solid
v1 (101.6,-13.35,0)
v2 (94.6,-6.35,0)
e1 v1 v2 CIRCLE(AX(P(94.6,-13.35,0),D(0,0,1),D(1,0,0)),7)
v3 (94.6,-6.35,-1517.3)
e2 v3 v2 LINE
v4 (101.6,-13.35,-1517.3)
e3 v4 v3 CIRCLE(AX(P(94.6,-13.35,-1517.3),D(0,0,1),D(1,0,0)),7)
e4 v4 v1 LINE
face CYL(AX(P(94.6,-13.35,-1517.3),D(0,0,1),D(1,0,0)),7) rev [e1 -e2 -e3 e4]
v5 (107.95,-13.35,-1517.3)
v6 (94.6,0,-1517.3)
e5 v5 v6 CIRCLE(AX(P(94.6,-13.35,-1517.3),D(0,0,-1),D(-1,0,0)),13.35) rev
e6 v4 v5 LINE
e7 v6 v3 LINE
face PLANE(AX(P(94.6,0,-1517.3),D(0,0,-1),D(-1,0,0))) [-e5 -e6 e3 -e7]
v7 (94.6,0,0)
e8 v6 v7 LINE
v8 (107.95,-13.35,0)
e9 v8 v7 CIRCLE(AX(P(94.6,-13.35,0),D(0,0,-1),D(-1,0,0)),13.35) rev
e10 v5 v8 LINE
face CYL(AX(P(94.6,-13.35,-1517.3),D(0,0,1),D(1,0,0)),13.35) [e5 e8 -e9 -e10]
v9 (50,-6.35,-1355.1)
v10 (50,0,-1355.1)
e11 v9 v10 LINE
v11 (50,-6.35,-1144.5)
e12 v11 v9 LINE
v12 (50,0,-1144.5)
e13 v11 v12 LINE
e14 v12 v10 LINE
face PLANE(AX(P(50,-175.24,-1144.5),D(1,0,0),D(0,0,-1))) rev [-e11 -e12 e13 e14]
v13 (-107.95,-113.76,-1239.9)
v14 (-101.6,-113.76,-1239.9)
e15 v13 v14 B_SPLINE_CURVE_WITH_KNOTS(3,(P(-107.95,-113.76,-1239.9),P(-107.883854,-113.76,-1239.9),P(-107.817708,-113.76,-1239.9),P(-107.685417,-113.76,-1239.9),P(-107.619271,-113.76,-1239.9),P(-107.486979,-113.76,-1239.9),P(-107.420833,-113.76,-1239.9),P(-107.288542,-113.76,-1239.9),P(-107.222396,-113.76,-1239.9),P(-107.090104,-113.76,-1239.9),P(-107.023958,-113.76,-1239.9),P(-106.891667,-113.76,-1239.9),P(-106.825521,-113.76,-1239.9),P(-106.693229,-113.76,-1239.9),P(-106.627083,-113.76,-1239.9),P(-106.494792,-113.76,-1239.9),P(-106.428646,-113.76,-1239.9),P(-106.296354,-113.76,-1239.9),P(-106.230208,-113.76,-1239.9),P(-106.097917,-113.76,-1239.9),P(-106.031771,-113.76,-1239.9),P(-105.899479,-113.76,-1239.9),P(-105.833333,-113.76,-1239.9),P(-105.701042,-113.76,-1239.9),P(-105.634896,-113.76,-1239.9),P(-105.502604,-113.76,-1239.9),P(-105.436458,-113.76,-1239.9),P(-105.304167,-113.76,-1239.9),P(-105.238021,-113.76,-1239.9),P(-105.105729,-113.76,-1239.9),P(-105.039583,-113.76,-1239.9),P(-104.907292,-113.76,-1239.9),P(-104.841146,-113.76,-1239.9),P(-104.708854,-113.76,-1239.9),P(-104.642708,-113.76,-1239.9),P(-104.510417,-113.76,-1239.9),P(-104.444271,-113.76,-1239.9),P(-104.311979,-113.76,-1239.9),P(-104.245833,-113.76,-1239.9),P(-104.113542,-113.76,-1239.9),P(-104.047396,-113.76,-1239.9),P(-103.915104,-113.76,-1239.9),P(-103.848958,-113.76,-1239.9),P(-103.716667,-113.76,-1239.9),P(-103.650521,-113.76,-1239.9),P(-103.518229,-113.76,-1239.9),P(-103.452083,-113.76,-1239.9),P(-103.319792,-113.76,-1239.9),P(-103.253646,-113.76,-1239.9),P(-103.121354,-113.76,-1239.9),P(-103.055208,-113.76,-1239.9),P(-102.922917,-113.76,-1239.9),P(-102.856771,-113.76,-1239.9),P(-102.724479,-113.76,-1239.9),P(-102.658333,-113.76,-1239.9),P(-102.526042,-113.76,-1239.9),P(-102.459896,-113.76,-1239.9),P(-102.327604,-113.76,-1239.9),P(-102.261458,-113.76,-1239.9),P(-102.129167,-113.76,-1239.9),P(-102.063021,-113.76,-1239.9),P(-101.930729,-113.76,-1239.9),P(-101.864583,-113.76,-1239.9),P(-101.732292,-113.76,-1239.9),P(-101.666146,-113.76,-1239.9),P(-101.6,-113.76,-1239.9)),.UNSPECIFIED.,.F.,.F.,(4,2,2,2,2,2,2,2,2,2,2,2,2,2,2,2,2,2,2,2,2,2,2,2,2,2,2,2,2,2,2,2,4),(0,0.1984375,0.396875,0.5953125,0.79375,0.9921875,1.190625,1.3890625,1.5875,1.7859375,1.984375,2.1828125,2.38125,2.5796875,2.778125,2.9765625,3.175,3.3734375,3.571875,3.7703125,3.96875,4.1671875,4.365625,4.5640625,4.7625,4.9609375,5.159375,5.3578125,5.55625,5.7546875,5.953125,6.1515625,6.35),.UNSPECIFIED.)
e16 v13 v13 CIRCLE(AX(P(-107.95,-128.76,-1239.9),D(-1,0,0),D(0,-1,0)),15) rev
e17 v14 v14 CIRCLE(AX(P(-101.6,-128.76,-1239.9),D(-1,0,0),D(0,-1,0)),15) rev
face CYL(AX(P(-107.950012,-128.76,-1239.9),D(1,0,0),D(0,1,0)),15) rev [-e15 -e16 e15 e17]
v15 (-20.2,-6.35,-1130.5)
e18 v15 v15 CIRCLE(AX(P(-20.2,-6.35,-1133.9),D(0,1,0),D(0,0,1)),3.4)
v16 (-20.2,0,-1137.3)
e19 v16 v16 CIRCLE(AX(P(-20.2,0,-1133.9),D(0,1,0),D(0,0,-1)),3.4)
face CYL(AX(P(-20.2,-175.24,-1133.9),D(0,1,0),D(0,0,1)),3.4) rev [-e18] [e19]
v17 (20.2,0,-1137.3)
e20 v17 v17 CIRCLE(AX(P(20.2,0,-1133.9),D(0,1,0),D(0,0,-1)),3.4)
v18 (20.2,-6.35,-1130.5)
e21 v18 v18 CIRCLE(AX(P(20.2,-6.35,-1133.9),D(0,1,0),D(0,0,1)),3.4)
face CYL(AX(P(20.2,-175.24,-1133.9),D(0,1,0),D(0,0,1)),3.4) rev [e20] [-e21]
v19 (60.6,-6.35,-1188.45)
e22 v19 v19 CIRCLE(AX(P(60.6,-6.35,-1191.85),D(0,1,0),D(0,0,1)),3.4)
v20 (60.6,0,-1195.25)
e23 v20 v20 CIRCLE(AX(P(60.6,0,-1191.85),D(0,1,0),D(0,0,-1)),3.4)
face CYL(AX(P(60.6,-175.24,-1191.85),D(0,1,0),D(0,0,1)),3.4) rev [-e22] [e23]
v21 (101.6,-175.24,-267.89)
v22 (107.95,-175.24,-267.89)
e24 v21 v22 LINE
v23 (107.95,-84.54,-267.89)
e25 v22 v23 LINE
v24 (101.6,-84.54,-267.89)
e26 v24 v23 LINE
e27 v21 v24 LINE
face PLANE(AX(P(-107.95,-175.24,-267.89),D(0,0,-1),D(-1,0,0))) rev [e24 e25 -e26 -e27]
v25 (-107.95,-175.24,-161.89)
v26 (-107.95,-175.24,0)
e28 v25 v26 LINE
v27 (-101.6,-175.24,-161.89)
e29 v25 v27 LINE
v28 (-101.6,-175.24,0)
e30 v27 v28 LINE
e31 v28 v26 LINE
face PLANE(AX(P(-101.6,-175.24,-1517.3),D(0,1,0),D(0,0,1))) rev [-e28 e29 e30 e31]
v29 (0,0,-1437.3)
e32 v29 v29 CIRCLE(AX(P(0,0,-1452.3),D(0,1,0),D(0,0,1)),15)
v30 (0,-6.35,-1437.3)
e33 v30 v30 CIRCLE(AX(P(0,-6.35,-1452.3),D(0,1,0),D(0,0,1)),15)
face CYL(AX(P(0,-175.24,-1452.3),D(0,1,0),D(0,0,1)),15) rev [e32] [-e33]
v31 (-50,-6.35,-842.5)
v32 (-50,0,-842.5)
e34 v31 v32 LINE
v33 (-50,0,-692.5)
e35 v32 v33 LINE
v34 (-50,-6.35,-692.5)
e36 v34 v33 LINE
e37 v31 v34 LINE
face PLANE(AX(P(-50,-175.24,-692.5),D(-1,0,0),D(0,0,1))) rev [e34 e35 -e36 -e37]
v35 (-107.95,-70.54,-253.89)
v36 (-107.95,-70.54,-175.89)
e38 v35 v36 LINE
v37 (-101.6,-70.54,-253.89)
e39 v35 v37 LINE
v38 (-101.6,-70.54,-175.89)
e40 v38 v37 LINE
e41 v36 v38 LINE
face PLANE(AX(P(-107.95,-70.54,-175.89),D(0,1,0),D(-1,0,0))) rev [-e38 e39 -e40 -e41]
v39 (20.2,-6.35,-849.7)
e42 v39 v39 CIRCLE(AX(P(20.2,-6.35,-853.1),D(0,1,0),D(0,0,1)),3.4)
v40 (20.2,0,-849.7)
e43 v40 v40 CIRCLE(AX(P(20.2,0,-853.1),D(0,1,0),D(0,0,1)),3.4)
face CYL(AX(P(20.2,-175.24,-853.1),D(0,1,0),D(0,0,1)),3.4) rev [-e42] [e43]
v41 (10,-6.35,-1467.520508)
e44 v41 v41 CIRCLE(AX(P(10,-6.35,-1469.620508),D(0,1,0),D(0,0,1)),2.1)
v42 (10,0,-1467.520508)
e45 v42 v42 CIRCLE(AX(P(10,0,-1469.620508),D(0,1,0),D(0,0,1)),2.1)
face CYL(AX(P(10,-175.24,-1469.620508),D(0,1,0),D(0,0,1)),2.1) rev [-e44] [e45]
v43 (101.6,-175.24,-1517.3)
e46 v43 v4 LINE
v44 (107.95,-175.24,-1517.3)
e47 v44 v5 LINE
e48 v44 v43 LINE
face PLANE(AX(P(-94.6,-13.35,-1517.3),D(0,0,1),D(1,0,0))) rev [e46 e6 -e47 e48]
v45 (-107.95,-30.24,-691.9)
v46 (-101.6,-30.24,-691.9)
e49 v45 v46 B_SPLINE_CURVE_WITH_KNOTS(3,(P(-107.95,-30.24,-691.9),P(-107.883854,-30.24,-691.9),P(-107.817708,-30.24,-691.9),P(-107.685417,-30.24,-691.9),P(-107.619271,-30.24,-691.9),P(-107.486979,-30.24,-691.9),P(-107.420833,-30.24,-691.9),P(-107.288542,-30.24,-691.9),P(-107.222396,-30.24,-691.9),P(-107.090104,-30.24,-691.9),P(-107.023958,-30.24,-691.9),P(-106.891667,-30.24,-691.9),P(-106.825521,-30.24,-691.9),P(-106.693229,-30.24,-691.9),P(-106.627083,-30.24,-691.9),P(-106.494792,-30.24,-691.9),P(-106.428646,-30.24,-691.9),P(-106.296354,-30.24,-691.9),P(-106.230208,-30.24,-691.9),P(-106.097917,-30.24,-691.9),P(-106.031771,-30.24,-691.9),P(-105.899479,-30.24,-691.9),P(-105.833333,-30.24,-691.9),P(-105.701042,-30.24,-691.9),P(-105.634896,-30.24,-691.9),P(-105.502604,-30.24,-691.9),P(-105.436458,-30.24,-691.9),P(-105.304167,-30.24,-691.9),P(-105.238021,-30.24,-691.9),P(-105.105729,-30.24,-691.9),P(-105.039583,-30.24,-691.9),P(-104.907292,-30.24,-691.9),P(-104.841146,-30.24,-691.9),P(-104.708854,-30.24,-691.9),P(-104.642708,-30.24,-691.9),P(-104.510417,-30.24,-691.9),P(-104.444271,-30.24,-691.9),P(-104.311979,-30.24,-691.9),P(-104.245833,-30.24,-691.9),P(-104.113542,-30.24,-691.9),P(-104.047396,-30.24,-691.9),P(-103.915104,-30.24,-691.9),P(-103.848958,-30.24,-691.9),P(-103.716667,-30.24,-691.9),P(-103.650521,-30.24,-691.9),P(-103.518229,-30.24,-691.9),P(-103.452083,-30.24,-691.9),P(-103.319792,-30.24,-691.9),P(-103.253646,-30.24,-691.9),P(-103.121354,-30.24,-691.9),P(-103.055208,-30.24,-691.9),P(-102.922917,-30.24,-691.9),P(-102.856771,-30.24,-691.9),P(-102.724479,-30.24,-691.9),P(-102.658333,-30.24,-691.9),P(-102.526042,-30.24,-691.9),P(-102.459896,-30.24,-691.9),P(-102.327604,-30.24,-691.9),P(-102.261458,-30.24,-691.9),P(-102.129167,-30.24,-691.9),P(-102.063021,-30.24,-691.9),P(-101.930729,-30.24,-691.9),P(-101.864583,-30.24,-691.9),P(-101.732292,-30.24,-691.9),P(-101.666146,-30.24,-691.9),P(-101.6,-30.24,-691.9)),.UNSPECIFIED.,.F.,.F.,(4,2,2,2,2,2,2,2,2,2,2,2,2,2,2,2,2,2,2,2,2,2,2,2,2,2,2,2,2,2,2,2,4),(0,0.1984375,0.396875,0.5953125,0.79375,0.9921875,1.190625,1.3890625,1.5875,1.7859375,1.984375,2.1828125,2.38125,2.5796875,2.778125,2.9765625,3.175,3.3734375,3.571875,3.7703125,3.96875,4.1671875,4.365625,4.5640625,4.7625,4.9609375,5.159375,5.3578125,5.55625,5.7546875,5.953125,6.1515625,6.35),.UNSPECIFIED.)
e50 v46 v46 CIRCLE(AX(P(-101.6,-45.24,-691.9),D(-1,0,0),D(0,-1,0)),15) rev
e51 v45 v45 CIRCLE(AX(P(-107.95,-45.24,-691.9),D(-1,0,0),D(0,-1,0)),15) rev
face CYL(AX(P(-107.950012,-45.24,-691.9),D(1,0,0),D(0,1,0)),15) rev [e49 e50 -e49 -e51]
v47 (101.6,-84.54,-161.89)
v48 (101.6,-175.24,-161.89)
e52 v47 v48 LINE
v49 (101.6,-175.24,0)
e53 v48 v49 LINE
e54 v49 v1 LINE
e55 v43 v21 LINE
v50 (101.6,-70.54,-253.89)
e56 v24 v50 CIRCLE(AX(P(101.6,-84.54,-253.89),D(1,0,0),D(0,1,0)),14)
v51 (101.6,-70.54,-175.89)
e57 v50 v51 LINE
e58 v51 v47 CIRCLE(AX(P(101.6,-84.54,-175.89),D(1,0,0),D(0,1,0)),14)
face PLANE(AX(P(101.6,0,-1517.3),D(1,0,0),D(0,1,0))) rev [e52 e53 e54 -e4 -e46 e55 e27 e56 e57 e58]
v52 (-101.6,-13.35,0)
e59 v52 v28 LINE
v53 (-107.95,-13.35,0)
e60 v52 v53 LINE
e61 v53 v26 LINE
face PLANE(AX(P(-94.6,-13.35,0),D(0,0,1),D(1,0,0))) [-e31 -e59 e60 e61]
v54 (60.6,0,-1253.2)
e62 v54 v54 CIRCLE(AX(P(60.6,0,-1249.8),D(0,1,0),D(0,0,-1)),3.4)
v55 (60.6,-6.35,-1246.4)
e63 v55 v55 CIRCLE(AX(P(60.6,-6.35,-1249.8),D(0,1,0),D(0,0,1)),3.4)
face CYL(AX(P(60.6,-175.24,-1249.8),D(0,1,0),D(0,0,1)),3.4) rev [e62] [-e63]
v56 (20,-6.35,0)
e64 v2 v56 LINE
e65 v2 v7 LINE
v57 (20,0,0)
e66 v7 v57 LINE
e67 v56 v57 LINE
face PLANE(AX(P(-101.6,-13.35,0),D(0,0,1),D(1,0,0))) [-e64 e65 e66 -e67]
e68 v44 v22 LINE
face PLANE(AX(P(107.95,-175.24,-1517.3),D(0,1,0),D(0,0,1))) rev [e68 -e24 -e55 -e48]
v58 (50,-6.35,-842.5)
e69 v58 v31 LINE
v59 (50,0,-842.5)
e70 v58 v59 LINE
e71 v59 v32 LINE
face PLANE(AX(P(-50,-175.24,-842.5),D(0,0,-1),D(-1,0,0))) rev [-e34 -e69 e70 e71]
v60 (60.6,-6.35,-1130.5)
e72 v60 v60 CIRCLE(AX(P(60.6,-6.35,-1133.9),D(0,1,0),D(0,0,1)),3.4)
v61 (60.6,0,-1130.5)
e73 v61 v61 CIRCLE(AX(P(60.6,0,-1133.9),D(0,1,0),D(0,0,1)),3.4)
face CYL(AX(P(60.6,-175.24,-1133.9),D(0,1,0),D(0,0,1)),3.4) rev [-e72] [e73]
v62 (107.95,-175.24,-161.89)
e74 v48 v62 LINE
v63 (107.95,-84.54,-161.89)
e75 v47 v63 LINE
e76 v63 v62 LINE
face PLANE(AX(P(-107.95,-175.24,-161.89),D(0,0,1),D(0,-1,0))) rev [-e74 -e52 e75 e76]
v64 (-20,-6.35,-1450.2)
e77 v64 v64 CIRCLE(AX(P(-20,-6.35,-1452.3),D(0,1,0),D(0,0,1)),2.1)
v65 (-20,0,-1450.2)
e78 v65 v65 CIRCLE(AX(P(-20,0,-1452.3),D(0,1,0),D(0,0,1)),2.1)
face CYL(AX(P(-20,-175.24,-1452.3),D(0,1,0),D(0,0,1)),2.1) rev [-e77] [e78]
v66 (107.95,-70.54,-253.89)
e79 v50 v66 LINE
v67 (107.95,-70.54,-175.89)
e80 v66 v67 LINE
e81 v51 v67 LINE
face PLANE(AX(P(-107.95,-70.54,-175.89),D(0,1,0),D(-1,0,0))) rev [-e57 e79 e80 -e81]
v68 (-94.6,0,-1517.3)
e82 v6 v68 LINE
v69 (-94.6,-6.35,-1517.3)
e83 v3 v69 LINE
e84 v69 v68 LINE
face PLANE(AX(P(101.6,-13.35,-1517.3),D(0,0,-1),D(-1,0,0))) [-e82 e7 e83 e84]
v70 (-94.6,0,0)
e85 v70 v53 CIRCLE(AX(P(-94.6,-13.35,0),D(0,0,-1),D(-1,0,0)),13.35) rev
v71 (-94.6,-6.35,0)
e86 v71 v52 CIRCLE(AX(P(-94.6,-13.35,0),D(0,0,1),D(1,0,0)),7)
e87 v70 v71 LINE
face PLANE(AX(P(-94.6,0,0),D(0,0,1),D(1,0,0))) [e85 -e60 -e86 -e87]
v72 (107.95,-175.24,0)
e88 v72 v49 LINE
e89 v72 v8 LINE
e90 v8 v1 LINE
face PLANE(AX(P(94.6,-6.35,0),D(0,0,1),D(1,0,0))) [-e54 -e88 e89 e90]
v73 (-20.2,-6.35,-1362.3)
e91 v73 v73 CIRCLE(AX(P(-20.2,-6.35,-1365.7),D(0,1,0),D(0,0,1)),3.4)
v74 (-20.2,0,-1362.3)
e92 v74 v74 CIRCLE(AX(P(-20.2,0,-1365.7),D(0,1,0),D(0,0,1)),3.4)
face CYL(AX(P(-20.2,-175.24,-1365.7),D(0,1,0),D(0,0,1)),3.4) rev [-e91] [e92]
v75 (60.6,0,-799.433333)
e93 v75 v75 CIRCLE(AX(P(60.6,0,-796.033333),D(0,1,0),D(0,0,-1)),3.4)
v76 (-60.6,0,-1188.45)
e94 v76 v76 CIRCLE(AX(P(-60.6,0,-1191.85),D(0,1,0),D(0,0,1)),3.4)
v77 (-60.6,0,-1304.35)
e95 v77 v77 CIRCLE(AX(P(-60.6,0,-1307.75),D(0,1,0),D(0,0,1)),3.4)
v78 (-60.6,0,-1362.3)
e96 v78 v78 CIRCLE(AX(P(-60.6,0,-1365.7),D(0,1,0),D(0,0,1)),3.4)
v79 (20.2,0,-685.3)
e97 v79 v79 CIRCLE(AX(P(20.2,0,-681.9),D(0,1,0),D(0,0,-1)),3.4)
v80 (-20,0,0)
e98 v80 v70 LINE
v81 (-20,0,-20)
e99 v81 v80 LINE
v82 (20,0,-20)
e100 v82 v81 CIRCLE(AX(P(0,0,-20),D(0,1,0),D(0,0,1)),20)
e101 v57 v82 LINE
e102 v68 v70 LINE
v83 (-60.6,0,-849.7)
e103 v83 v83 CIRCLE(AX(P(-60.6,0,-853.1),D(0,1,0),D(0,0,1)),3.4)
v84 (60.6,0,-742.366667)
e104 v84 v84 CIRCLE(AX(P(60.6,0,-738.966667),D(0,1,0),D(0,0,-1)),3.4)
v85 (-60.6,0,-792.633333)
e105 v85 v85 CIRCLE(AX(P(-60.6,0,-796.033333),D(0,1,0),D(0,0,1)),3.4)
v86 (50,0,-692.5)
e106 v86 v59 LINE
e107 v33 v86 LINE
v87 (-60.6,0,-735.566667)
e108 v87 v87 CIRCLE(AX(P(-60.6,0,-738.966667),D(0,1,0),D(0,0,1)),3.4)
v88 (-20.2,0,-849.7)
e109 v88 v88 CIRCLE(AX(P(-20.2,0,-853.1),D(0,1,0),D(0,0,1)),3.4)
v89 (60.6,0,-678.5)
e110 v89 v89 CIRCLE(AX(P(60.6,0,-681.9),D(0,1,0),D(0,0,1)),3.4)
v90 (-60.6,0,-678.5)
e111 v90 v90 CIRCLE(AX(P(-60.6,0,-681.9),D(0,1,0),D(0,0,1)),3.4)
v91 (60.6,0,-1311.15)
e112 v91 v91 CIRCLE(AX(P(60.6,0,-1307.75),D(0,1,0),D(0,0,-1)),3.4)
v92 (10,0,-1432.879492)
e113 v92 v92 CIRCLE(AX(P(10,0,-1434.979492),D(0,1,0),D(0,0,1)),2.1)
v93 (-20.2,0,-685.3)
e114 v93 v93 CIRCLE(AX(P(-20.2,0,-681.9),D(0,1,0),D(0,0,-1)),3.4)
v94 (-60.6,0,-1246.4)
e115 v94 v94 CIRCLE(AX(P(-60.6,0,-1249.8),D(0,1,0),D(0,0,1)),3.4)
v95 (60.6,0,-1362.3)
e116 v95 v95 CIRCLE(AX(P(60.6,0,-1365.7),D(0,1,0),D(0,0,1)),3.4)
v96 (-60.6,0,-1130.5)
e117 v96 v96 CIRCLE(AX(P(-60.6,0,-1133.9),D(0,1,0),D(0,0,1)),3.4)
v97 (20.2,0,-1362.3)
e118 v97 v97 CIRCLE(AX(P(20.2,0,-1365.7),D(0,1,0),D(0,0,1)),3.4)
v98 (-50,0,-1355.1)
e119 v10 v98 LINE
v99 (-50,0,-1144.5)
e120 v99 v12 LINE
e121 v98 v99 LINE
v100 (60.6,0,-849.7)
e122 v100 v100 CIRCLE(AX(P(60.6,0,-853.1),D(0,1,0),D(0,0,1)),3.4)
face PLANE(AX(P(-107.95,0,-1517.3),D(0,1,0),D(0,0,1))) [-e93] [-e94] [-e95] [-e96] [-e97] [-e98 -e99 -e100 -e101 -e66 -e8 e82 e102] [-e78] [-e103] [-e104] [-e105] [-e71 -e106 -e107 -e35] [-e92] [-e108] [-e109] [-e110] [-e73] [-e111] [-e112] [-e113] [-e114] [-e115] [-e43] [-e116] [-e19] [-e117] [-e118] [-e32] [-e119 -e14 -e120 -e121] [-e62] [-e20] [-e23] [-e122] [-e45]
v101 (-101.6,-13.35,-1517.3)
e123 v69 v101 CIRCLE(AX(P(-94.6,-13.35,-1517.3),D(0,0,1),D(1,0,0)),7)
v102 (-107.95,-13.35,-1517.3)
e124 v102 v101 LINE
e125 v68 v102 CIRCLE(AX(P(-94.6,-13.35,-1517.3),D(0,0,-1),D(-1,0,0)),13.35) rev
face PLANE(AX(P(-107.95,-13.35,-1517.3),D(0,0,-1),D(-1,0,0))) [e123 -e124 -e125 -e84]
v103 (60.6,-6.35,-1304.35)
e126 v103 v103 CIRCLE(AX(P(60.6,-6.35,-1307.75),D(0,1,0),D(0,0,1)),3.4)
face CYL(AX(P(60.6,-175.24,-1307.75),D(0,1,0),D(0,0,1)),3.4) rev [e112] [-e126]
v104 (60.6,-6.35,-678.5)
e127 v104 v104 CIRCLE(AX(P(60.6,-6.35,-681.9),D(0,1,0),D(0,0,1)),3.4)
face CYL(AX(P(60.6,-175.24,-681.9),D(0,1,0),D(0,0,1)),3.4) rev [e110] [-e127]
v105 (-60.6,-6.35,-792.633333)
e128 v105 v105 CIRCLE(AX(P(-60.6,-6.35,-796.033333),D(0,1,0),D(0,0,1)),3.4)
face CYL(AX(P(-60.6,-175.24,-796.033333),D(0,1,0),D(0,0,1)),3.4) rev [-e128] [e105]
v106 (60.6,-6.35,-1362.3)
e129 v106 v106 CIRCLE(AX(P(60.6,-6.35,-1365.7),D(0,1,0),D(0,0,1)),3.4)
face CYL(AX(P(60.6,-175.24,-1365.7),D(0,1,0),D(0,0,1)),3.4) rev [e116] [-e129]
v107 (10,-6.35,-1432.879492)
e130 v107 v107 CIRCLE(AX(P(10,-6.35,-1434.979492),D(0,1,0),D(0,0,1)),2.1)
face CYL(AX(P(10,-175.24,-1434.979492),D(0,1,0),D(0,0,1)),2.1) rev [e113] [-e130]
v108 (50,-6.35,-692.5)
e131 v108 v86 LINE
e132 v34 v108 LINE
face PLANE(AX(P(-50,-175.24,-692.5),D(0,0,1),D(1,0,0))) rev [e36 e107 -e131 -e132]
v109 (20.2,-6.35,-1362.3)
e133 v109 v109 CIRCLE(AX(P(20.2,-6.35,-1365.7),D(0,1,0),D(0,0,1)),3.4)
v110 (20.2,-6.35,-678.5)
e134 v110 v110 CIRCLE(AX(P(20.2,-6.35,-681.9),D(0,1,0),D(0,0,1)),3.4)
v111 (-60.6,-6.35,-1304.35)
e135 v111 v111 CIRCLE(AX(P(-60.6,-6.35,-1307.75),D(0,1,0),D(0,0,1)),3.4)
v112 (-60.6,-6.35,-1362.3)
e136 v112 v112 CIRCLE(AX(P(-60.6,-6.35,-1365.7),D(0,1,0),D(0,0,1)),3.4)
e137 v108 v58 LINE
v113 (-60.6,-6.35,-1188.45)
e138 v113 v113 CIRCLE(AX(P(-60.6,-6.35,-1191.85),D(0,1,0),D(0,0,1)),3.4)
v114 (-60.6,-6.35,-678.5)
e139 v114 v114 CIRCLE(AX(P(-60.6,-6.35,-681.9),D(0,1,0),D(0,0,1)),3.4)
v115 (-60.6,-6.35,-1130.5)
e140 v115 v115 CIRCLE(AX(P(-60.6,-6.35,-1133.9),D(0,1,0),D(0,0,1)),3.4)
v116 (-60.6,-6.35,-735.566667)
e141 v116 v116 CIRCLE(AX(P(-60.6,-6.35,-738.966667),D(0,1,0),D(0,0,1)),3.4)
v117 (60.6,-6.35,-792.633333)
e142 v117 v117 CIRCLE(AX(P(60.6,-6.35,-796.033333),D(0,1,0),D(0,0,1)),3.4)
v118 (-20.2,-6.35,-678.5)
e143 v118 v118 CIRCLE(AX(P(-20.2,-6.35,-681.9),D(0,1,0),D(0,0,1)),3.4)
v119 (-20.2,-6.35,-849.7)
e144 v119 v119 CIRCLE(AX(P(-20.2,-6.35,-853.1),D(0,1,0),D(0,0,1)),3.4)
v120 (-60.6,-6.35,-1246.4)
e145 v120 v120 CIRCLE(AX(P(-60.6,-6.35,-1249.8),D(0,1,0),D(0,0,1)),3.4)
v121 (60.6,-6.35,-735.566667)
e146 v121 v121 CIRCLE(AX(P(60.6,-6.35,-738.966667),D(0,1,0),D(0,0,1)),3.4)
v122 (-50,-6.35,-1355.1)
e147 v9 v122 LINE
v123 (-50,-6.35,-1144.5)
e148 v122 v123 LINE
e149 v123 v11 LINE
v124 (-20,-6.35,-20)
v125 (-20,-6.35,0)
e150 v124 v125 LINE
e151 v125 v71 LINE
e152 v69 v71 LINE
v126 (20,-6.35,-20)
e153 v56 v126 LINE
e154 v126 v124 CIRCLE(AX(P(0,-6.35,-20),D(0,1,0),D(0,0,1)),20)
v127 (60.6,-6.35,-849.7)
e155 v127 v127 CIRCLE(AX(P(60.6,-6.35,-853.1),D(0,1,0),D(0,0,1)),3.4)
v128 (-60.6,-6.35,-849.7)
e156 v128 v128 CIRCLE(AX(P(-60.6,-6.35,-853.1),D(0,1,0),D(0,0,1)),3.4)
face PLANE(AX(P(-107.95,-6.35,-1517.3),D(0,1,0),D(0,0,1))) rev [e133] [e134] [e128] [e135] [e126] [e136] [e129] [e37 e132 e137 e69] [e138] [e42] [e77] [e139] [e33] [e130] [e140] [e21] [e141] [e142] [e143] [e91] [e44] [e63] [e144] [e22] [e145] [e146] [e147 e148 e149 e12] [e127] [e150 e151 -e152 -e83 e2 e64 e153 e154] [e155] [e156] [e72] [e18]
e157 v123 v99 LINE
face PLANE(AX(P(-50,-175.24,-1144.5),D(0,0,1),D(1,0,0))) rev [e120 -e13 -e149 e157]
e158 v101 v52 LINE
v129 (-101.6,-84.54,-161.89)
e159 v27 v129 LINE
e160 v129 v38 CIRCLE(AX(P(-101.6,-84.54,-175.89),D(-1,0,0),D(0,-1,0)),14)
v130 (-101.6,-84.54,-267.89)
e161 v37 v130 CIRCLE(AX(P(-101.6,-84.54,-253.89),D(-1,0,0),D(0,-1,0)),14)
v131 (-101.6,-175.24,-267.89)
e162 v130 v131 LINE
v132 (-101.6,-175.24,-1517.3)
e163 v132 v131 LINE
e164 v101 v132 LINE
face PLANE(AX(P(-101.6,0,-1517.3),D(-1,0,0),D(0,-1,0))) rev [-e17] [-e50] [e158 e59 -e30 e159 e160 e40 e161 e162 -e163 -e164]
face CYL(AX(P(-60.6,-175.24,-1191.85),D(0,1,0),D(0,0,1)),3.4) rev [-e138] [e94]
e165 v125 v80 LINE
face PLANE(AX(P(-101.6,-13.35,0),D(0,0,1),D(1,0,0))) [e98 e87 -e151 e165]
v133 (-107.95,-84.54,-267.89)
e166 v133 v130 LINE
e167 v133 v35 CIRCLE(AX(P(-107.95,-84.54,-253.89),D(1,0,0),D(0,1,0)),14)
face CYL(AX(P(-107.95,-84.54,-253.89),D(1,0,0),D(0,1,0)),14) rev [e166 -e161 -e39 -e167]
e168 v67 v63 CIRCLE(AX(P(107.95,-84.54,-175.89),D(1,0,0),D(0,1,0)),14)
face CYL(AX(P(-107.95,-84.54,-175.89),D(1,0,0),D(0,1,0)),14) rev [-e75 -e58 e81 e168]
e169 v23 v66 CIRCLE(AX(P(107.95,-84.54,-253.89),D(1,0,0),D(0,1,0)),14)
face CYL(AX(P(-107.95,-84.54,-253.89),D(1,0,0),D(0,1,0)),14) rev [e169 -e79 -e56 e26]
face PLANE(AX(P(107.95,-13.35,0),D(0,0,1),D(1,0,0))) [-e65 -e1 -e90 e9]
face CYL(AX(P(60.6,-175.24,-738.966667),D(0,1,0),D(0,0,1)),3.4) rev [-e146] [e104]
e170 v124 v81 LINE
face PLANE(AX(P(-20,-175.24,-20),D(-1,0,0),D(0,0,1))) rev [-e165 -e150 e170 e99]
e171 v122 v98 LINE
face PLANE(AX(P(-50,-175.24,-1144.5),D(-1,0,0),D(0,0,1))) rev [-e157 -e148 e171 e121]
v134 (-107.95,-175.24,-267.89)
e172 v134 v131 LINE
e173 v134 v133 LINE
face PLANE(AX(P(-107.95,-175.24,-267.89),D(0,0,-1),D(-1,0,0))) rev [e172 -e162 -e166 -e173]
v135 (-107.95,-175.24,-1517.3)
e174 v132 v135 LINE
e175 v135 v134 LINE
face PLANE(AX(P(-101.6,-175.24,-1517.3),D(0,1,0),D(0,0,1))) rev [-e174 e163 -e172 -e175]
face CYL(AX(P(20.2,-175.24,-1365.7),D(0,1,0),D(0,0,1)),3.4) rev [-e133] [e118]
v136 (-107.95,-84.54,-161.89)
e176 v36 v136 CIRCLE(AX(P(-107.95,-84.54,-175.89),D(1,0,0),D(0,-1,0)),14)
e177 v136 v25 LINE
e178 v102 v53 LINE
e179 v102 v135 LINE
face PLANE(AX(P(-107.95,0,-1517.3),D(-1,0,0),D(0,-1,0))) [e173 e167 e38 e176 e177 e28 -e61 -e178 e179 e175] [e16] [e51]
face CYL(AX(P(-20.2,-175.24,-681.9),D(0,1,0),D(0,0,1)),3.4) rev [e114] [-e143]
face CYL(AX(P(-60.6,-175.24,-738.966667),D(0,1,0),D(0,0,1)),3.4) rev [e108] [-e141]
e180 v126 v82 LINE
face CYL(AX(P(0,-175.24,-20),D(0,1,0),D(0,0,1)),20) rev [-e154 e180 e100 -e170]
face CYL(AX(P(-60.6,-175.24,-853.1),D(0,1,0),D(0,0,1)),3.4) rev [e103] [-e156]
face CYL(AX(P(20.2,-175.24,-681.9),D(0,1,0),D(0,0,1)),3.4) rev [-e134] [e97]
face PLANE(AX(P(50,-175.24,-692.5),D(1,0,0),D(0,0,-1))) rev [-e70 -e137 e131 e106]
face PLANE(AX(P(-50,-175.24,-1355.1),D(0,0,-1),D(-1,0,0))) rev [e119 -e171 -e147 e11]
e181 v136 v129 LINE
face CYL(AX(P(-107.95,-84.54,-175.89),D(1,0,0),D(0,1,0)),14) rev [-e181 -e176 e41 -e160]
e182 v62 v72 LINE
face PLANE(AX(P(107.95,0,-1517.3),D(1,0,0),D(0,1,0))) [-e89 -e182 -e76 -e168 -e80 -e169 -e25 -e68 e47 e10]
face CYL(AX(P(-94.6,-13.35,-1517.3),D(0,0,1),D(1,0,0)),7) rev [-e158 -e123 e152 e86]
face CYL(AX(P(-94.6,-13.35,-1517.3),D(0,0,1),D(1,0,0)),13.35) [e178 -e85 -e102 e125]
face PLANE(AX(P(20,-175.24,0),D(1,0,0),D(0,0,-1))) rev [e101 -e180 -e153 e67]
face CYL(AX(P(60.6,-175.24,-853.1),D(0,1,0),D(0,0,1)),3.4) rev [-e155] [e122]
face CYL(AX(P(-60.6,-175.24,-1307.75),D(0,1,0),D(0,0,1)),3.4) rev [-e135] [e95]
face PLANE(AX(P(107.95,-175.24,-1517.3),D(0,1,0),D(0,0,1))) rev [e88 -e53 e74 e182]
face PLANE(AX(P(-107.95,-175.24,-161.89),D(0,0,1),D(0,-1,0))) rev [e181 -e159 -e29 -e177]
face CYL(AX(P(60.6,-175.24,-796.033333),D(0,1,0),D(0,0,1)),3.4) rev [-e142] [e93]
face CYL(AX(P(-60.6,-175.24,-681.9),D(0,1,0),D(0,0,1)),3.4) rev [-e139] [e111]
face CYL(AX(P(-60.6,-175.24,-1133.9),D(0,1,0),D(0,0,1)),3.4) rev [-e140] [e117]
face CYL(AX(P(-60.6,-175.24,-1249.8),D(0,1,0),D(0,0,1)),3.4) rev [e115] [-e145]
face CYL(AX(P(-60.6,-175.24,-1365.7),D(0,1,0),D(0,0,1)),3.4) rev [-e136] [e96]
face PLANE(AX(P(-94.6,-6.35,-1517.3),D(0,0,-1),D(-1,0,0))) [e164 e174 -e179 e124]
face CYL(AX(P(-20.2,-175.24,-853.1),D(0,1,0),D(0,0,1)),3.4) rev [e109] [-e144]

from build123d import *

# Parameters (mm, degrees)
FLANGE_BASE2_DEPTH         = 1517.3
ESBO_O10_R                 = 15
ESBO_O10_R_2               = 2.1
ESBO_O10_R_3               = 3.4
ESBO_O10_W                 = 100
ESBO_O10_H                 = 210.6
ESBO_O10_H_2               = 150
CORTE_EXTRUS_O1_DEPTH      = 1532.196117452
CORTE_EXTRUS_O2_DEPTH      = 1543.569660534
CORTE_EXTRUS_O2_DEPTH_BACK = 1543.569660534
CORTE_EXTRUS_O3_DEPTH      = 1543.569660534
CORTE_EXTRUS_O3_DEPTH_BACK = 10
ESBO_O12_R                 = 15


# Sheet-metal steps are written as plain solids
with BuildPart() as part:
    # Esboço1 → Flange-base2 (new body)
    with BuildSketch(Plane.XY):
        with BuildLine():
            Line((-107.95, -175.24), (-107.95, -13.35))
            ThreePointArc((-107.95, -13.35), (-104.039875529, -3.910124471), (-94.6, 0))
            Line((-94.6, 0), (94.6, 0))
            ThreePointArc((94.6, 0), (104.039875529, -3.910124471), (107.95, -13.35))
            Line((107.95, -13.35), (107.95, -175.24))
            Line((107.95, -175.24), (101.6, -175.24))
            Line((101.6, -175.24), (101.6, -13.35))
            ThreePointArc((101.6, -13.35), (99.549747468, -8.400252532), (94.6, -6.35))
            Line((94.6, -6.35), (-94.6, -6.35))
            ThreePointArc((-94.6, -6.35), (-99.549747468, -8.400252532), (-101.6, -13.35))
            Line((-101.6, -13.35), (-101.6, -175.24))
            Line((-101.6, -175.24), (-107.95, -175.24))
        make_face()
    extrude(amount=-FLANGE_BASE2_DEPTH)

    # Esboço10 → Corte-extrusão1 (cut, through all)
    with BuildSketch(Plane(origin=(0, 0, 0), x_dir=(1, 0, 0), z_dir=(0, 1, 0))):
        with Locations(Location((0, 1452.3, 0), (0, 0, 270))):
            Circle(ESBO_O10_R)
        with Locations(Location((-20, 1452.3, 0), (0, 0, 270))):
            Circle(ESBO_O10_R_2)
        with Locations(Location((10, 1469.620508076, 0), (0, 0, 270))):
            Circle(ESBO_O10_R_2)
        with Locations(Location((10, 1434.979491924, 0), (0, 0, 270))):
            Circle(ESBO_O10_R_2)
        with Locations(Location((-60.6, 1365.7, 0), (0, 0, 270))):
            Circle(ESBO_O10_R_3)
        with Locations(Location((60.6, 1365.7, 0), (0, 0, 270))):
            Circle(ESBO_O10_R_3)
        with Locations(Location((60.6, 1133.9, 0), (0, 0, 270))):
            Circle(ESBO_O10_R_3)
        with Locations(Location((-60.6, 1133.9, 0), (0, 0, 270))):
            Circle(ESBO_O10_R_3)
        with Locations(Location((-20.2, 1365.7, 0), (0, 0, 270))):
            Circle(ESBO_O10_R_3)
        with Locations(Location((20.2, 1365.7, 0), (0, 0, 270))):
            Circle(ESBO_O10_R_3)
        with Locations(Location((-60.6, 1191.85, 0), (0, 0, 270))):
            Circle(ESBO_O10_R_3)
        with Locations(Location((-60.6, 1249.8, 0), (0, 0, 270))):
            Circle(ESBO_O10_R_3)
        with Locations(Location((-60.6, 1307.75, 0), (0, 0, 270))):
            Circle(ESBO_O10_R_3)
        with Locations(Location((20.2, 1133.9, 0), (0, 0, 270))):
            Circle(ESBO_O10_R_3)
        with Locations(Location((-20.2, 1133.9, 0), (0, 0, 270))):
            Circle(ESBO_O10_R_3)
        with Locations(Location((60.6, 1191.85, 0), (0, 0, 270))):
            Circle(ESBO_O10_R_3)
        with Locations(Location((60.6, 1249.8, 0), (0, 0, 270))):
            Circle(ESBO_O10_R_3)
        with Locations(Location((60.6, 1307.75, 0), (0, 0, 270))):
            Circle(ESBO_O10_R_3)
        with Locations(Location((-60.6, 853.1, 0), (0, 0, 270))):
            Circle(ESBO_O10_R_3)
        with Locations(Location((60.6, 853.1, 0), (0, 0, 270))):
            Circle(ESBO_O10_R_3)
        with Locations(Location((60.6, 681.9, 0), (0, 0, 270))):
            Circle(ESBO_O10_R_3)
        with Locations(Location((-60.6, 681.9, 0), (0, 0, 270))):
            Circle(ESBO_O10_R_3)
        with Locations(Location((-20.2, 853.1, 0), (0, 0, 270))):
            Circle(ESBO_O10_R_3)
        with Locations(Location((20.2, 853.1, 0), (0, 0, 270))):
            Circle(ESBO_O10_R_3)
        with Locations(Location((-60.6, 738.966666667, 0), (0, 0, 270))):
            Circle(ESBO_O10_R_3)
        with Locations(Location((-60.6, 796.033333333, 0), (0, 0, 270))):
            Circle(ESBO_O10_R_3)
        with Locations(Location((20.2, 681.9, 0), (0, 0, 270))):
            Circle(ESBO_O10_R_3)
        with Locations(Location((-20.2, 681.9, 0), (0, 0, 270))):
            Circle(ESBO_O10_R_3)
        with Locations(Location((60.6, 738.966666667, 0), (0, 0, 270))):
            Circle(ESBO_O10_R_3)
        with Locations(Location((60.6, 796.033333333, 0), (0, 0, 270))):
            Circle(ESBO_O10_R_3)
        with Locations((0, 1249.8)):
            Rectangle(ESBO_O10_W, ESBO_O10_H)
        with Locations((0, 767.5)):
            Rectangle(ESBO_O10_W, ESBO_O10_H_2)
        with BuildLine():
            Line((-20, 20), (-20, 0))
            Line((-20, 0), (20, 0))
            Line((20, 0), (20, 20))
            ThreePointArc((20, 20), (0, 40), (-20, 20))
        make_face()
    extrude(amount=-CORTE_EXTRUS_O1_DEPTH, mode=Mode.SUBTRACT)

    # Esboço11 → Corte-extrusão2 (cut, two sides: drawn at the far end of the back side and taken through both)
    with BuildSketch(Plane(origin=(107.95, 0, 0), x_dir=(0, 0, -1), z_dir=(1, 0, 0)).offset(-CORTE_EXTRUS_O2_DEPTH_BACK)):
        with BuildLine():
            Line((161.89, -175.24), (267.89, -175.24))
            Line((267.89, -175.24), (267.89, -84.54))
            ThreePointArc((267.89, -84.54), (263.789494937, -74.640505063), (253.89, -70.54))
            Line((253.89, -70.54), (175.89, -70.54))
            ThreePointArc((175.89, -70.54), (165.990505063, -74.640505063), (161.89, -84.54))
            Line((161.89, -84.54), (161.89, -175.24))
        make_face()
    extrude(amount=CORTE_EXTRUS_O2_DEPTH + CORTE_EXTRUS_O2_DEPTH_BACK, mode=Mode.SUBTRACT)

    # Esboço12 → Corte-extrusão3 (cut, two sides: drawn at the far end of the back side and taken through both)
    with BuildSketch(Plane.ZY.offset(107.95).offset(-CORTE_EXTRUS_O3_DEPTH_BACK)):
        with Locations(Location((-1239.9, -128.76, 0), (0, 0, 90))):
            Circle(ESBO_O12_R)
        with Locations(Location((-691.9, -45.24, 0), (0, 0, 90))):
            Circle(ESBO_O12_R)
    extrude(amount=CORTE_EXTRUS_O3_DEPTH + CORTE_EXTRUS_O3_DEPTH_BACK, mode=Mode.SUBTRACT)


solid = part.part
